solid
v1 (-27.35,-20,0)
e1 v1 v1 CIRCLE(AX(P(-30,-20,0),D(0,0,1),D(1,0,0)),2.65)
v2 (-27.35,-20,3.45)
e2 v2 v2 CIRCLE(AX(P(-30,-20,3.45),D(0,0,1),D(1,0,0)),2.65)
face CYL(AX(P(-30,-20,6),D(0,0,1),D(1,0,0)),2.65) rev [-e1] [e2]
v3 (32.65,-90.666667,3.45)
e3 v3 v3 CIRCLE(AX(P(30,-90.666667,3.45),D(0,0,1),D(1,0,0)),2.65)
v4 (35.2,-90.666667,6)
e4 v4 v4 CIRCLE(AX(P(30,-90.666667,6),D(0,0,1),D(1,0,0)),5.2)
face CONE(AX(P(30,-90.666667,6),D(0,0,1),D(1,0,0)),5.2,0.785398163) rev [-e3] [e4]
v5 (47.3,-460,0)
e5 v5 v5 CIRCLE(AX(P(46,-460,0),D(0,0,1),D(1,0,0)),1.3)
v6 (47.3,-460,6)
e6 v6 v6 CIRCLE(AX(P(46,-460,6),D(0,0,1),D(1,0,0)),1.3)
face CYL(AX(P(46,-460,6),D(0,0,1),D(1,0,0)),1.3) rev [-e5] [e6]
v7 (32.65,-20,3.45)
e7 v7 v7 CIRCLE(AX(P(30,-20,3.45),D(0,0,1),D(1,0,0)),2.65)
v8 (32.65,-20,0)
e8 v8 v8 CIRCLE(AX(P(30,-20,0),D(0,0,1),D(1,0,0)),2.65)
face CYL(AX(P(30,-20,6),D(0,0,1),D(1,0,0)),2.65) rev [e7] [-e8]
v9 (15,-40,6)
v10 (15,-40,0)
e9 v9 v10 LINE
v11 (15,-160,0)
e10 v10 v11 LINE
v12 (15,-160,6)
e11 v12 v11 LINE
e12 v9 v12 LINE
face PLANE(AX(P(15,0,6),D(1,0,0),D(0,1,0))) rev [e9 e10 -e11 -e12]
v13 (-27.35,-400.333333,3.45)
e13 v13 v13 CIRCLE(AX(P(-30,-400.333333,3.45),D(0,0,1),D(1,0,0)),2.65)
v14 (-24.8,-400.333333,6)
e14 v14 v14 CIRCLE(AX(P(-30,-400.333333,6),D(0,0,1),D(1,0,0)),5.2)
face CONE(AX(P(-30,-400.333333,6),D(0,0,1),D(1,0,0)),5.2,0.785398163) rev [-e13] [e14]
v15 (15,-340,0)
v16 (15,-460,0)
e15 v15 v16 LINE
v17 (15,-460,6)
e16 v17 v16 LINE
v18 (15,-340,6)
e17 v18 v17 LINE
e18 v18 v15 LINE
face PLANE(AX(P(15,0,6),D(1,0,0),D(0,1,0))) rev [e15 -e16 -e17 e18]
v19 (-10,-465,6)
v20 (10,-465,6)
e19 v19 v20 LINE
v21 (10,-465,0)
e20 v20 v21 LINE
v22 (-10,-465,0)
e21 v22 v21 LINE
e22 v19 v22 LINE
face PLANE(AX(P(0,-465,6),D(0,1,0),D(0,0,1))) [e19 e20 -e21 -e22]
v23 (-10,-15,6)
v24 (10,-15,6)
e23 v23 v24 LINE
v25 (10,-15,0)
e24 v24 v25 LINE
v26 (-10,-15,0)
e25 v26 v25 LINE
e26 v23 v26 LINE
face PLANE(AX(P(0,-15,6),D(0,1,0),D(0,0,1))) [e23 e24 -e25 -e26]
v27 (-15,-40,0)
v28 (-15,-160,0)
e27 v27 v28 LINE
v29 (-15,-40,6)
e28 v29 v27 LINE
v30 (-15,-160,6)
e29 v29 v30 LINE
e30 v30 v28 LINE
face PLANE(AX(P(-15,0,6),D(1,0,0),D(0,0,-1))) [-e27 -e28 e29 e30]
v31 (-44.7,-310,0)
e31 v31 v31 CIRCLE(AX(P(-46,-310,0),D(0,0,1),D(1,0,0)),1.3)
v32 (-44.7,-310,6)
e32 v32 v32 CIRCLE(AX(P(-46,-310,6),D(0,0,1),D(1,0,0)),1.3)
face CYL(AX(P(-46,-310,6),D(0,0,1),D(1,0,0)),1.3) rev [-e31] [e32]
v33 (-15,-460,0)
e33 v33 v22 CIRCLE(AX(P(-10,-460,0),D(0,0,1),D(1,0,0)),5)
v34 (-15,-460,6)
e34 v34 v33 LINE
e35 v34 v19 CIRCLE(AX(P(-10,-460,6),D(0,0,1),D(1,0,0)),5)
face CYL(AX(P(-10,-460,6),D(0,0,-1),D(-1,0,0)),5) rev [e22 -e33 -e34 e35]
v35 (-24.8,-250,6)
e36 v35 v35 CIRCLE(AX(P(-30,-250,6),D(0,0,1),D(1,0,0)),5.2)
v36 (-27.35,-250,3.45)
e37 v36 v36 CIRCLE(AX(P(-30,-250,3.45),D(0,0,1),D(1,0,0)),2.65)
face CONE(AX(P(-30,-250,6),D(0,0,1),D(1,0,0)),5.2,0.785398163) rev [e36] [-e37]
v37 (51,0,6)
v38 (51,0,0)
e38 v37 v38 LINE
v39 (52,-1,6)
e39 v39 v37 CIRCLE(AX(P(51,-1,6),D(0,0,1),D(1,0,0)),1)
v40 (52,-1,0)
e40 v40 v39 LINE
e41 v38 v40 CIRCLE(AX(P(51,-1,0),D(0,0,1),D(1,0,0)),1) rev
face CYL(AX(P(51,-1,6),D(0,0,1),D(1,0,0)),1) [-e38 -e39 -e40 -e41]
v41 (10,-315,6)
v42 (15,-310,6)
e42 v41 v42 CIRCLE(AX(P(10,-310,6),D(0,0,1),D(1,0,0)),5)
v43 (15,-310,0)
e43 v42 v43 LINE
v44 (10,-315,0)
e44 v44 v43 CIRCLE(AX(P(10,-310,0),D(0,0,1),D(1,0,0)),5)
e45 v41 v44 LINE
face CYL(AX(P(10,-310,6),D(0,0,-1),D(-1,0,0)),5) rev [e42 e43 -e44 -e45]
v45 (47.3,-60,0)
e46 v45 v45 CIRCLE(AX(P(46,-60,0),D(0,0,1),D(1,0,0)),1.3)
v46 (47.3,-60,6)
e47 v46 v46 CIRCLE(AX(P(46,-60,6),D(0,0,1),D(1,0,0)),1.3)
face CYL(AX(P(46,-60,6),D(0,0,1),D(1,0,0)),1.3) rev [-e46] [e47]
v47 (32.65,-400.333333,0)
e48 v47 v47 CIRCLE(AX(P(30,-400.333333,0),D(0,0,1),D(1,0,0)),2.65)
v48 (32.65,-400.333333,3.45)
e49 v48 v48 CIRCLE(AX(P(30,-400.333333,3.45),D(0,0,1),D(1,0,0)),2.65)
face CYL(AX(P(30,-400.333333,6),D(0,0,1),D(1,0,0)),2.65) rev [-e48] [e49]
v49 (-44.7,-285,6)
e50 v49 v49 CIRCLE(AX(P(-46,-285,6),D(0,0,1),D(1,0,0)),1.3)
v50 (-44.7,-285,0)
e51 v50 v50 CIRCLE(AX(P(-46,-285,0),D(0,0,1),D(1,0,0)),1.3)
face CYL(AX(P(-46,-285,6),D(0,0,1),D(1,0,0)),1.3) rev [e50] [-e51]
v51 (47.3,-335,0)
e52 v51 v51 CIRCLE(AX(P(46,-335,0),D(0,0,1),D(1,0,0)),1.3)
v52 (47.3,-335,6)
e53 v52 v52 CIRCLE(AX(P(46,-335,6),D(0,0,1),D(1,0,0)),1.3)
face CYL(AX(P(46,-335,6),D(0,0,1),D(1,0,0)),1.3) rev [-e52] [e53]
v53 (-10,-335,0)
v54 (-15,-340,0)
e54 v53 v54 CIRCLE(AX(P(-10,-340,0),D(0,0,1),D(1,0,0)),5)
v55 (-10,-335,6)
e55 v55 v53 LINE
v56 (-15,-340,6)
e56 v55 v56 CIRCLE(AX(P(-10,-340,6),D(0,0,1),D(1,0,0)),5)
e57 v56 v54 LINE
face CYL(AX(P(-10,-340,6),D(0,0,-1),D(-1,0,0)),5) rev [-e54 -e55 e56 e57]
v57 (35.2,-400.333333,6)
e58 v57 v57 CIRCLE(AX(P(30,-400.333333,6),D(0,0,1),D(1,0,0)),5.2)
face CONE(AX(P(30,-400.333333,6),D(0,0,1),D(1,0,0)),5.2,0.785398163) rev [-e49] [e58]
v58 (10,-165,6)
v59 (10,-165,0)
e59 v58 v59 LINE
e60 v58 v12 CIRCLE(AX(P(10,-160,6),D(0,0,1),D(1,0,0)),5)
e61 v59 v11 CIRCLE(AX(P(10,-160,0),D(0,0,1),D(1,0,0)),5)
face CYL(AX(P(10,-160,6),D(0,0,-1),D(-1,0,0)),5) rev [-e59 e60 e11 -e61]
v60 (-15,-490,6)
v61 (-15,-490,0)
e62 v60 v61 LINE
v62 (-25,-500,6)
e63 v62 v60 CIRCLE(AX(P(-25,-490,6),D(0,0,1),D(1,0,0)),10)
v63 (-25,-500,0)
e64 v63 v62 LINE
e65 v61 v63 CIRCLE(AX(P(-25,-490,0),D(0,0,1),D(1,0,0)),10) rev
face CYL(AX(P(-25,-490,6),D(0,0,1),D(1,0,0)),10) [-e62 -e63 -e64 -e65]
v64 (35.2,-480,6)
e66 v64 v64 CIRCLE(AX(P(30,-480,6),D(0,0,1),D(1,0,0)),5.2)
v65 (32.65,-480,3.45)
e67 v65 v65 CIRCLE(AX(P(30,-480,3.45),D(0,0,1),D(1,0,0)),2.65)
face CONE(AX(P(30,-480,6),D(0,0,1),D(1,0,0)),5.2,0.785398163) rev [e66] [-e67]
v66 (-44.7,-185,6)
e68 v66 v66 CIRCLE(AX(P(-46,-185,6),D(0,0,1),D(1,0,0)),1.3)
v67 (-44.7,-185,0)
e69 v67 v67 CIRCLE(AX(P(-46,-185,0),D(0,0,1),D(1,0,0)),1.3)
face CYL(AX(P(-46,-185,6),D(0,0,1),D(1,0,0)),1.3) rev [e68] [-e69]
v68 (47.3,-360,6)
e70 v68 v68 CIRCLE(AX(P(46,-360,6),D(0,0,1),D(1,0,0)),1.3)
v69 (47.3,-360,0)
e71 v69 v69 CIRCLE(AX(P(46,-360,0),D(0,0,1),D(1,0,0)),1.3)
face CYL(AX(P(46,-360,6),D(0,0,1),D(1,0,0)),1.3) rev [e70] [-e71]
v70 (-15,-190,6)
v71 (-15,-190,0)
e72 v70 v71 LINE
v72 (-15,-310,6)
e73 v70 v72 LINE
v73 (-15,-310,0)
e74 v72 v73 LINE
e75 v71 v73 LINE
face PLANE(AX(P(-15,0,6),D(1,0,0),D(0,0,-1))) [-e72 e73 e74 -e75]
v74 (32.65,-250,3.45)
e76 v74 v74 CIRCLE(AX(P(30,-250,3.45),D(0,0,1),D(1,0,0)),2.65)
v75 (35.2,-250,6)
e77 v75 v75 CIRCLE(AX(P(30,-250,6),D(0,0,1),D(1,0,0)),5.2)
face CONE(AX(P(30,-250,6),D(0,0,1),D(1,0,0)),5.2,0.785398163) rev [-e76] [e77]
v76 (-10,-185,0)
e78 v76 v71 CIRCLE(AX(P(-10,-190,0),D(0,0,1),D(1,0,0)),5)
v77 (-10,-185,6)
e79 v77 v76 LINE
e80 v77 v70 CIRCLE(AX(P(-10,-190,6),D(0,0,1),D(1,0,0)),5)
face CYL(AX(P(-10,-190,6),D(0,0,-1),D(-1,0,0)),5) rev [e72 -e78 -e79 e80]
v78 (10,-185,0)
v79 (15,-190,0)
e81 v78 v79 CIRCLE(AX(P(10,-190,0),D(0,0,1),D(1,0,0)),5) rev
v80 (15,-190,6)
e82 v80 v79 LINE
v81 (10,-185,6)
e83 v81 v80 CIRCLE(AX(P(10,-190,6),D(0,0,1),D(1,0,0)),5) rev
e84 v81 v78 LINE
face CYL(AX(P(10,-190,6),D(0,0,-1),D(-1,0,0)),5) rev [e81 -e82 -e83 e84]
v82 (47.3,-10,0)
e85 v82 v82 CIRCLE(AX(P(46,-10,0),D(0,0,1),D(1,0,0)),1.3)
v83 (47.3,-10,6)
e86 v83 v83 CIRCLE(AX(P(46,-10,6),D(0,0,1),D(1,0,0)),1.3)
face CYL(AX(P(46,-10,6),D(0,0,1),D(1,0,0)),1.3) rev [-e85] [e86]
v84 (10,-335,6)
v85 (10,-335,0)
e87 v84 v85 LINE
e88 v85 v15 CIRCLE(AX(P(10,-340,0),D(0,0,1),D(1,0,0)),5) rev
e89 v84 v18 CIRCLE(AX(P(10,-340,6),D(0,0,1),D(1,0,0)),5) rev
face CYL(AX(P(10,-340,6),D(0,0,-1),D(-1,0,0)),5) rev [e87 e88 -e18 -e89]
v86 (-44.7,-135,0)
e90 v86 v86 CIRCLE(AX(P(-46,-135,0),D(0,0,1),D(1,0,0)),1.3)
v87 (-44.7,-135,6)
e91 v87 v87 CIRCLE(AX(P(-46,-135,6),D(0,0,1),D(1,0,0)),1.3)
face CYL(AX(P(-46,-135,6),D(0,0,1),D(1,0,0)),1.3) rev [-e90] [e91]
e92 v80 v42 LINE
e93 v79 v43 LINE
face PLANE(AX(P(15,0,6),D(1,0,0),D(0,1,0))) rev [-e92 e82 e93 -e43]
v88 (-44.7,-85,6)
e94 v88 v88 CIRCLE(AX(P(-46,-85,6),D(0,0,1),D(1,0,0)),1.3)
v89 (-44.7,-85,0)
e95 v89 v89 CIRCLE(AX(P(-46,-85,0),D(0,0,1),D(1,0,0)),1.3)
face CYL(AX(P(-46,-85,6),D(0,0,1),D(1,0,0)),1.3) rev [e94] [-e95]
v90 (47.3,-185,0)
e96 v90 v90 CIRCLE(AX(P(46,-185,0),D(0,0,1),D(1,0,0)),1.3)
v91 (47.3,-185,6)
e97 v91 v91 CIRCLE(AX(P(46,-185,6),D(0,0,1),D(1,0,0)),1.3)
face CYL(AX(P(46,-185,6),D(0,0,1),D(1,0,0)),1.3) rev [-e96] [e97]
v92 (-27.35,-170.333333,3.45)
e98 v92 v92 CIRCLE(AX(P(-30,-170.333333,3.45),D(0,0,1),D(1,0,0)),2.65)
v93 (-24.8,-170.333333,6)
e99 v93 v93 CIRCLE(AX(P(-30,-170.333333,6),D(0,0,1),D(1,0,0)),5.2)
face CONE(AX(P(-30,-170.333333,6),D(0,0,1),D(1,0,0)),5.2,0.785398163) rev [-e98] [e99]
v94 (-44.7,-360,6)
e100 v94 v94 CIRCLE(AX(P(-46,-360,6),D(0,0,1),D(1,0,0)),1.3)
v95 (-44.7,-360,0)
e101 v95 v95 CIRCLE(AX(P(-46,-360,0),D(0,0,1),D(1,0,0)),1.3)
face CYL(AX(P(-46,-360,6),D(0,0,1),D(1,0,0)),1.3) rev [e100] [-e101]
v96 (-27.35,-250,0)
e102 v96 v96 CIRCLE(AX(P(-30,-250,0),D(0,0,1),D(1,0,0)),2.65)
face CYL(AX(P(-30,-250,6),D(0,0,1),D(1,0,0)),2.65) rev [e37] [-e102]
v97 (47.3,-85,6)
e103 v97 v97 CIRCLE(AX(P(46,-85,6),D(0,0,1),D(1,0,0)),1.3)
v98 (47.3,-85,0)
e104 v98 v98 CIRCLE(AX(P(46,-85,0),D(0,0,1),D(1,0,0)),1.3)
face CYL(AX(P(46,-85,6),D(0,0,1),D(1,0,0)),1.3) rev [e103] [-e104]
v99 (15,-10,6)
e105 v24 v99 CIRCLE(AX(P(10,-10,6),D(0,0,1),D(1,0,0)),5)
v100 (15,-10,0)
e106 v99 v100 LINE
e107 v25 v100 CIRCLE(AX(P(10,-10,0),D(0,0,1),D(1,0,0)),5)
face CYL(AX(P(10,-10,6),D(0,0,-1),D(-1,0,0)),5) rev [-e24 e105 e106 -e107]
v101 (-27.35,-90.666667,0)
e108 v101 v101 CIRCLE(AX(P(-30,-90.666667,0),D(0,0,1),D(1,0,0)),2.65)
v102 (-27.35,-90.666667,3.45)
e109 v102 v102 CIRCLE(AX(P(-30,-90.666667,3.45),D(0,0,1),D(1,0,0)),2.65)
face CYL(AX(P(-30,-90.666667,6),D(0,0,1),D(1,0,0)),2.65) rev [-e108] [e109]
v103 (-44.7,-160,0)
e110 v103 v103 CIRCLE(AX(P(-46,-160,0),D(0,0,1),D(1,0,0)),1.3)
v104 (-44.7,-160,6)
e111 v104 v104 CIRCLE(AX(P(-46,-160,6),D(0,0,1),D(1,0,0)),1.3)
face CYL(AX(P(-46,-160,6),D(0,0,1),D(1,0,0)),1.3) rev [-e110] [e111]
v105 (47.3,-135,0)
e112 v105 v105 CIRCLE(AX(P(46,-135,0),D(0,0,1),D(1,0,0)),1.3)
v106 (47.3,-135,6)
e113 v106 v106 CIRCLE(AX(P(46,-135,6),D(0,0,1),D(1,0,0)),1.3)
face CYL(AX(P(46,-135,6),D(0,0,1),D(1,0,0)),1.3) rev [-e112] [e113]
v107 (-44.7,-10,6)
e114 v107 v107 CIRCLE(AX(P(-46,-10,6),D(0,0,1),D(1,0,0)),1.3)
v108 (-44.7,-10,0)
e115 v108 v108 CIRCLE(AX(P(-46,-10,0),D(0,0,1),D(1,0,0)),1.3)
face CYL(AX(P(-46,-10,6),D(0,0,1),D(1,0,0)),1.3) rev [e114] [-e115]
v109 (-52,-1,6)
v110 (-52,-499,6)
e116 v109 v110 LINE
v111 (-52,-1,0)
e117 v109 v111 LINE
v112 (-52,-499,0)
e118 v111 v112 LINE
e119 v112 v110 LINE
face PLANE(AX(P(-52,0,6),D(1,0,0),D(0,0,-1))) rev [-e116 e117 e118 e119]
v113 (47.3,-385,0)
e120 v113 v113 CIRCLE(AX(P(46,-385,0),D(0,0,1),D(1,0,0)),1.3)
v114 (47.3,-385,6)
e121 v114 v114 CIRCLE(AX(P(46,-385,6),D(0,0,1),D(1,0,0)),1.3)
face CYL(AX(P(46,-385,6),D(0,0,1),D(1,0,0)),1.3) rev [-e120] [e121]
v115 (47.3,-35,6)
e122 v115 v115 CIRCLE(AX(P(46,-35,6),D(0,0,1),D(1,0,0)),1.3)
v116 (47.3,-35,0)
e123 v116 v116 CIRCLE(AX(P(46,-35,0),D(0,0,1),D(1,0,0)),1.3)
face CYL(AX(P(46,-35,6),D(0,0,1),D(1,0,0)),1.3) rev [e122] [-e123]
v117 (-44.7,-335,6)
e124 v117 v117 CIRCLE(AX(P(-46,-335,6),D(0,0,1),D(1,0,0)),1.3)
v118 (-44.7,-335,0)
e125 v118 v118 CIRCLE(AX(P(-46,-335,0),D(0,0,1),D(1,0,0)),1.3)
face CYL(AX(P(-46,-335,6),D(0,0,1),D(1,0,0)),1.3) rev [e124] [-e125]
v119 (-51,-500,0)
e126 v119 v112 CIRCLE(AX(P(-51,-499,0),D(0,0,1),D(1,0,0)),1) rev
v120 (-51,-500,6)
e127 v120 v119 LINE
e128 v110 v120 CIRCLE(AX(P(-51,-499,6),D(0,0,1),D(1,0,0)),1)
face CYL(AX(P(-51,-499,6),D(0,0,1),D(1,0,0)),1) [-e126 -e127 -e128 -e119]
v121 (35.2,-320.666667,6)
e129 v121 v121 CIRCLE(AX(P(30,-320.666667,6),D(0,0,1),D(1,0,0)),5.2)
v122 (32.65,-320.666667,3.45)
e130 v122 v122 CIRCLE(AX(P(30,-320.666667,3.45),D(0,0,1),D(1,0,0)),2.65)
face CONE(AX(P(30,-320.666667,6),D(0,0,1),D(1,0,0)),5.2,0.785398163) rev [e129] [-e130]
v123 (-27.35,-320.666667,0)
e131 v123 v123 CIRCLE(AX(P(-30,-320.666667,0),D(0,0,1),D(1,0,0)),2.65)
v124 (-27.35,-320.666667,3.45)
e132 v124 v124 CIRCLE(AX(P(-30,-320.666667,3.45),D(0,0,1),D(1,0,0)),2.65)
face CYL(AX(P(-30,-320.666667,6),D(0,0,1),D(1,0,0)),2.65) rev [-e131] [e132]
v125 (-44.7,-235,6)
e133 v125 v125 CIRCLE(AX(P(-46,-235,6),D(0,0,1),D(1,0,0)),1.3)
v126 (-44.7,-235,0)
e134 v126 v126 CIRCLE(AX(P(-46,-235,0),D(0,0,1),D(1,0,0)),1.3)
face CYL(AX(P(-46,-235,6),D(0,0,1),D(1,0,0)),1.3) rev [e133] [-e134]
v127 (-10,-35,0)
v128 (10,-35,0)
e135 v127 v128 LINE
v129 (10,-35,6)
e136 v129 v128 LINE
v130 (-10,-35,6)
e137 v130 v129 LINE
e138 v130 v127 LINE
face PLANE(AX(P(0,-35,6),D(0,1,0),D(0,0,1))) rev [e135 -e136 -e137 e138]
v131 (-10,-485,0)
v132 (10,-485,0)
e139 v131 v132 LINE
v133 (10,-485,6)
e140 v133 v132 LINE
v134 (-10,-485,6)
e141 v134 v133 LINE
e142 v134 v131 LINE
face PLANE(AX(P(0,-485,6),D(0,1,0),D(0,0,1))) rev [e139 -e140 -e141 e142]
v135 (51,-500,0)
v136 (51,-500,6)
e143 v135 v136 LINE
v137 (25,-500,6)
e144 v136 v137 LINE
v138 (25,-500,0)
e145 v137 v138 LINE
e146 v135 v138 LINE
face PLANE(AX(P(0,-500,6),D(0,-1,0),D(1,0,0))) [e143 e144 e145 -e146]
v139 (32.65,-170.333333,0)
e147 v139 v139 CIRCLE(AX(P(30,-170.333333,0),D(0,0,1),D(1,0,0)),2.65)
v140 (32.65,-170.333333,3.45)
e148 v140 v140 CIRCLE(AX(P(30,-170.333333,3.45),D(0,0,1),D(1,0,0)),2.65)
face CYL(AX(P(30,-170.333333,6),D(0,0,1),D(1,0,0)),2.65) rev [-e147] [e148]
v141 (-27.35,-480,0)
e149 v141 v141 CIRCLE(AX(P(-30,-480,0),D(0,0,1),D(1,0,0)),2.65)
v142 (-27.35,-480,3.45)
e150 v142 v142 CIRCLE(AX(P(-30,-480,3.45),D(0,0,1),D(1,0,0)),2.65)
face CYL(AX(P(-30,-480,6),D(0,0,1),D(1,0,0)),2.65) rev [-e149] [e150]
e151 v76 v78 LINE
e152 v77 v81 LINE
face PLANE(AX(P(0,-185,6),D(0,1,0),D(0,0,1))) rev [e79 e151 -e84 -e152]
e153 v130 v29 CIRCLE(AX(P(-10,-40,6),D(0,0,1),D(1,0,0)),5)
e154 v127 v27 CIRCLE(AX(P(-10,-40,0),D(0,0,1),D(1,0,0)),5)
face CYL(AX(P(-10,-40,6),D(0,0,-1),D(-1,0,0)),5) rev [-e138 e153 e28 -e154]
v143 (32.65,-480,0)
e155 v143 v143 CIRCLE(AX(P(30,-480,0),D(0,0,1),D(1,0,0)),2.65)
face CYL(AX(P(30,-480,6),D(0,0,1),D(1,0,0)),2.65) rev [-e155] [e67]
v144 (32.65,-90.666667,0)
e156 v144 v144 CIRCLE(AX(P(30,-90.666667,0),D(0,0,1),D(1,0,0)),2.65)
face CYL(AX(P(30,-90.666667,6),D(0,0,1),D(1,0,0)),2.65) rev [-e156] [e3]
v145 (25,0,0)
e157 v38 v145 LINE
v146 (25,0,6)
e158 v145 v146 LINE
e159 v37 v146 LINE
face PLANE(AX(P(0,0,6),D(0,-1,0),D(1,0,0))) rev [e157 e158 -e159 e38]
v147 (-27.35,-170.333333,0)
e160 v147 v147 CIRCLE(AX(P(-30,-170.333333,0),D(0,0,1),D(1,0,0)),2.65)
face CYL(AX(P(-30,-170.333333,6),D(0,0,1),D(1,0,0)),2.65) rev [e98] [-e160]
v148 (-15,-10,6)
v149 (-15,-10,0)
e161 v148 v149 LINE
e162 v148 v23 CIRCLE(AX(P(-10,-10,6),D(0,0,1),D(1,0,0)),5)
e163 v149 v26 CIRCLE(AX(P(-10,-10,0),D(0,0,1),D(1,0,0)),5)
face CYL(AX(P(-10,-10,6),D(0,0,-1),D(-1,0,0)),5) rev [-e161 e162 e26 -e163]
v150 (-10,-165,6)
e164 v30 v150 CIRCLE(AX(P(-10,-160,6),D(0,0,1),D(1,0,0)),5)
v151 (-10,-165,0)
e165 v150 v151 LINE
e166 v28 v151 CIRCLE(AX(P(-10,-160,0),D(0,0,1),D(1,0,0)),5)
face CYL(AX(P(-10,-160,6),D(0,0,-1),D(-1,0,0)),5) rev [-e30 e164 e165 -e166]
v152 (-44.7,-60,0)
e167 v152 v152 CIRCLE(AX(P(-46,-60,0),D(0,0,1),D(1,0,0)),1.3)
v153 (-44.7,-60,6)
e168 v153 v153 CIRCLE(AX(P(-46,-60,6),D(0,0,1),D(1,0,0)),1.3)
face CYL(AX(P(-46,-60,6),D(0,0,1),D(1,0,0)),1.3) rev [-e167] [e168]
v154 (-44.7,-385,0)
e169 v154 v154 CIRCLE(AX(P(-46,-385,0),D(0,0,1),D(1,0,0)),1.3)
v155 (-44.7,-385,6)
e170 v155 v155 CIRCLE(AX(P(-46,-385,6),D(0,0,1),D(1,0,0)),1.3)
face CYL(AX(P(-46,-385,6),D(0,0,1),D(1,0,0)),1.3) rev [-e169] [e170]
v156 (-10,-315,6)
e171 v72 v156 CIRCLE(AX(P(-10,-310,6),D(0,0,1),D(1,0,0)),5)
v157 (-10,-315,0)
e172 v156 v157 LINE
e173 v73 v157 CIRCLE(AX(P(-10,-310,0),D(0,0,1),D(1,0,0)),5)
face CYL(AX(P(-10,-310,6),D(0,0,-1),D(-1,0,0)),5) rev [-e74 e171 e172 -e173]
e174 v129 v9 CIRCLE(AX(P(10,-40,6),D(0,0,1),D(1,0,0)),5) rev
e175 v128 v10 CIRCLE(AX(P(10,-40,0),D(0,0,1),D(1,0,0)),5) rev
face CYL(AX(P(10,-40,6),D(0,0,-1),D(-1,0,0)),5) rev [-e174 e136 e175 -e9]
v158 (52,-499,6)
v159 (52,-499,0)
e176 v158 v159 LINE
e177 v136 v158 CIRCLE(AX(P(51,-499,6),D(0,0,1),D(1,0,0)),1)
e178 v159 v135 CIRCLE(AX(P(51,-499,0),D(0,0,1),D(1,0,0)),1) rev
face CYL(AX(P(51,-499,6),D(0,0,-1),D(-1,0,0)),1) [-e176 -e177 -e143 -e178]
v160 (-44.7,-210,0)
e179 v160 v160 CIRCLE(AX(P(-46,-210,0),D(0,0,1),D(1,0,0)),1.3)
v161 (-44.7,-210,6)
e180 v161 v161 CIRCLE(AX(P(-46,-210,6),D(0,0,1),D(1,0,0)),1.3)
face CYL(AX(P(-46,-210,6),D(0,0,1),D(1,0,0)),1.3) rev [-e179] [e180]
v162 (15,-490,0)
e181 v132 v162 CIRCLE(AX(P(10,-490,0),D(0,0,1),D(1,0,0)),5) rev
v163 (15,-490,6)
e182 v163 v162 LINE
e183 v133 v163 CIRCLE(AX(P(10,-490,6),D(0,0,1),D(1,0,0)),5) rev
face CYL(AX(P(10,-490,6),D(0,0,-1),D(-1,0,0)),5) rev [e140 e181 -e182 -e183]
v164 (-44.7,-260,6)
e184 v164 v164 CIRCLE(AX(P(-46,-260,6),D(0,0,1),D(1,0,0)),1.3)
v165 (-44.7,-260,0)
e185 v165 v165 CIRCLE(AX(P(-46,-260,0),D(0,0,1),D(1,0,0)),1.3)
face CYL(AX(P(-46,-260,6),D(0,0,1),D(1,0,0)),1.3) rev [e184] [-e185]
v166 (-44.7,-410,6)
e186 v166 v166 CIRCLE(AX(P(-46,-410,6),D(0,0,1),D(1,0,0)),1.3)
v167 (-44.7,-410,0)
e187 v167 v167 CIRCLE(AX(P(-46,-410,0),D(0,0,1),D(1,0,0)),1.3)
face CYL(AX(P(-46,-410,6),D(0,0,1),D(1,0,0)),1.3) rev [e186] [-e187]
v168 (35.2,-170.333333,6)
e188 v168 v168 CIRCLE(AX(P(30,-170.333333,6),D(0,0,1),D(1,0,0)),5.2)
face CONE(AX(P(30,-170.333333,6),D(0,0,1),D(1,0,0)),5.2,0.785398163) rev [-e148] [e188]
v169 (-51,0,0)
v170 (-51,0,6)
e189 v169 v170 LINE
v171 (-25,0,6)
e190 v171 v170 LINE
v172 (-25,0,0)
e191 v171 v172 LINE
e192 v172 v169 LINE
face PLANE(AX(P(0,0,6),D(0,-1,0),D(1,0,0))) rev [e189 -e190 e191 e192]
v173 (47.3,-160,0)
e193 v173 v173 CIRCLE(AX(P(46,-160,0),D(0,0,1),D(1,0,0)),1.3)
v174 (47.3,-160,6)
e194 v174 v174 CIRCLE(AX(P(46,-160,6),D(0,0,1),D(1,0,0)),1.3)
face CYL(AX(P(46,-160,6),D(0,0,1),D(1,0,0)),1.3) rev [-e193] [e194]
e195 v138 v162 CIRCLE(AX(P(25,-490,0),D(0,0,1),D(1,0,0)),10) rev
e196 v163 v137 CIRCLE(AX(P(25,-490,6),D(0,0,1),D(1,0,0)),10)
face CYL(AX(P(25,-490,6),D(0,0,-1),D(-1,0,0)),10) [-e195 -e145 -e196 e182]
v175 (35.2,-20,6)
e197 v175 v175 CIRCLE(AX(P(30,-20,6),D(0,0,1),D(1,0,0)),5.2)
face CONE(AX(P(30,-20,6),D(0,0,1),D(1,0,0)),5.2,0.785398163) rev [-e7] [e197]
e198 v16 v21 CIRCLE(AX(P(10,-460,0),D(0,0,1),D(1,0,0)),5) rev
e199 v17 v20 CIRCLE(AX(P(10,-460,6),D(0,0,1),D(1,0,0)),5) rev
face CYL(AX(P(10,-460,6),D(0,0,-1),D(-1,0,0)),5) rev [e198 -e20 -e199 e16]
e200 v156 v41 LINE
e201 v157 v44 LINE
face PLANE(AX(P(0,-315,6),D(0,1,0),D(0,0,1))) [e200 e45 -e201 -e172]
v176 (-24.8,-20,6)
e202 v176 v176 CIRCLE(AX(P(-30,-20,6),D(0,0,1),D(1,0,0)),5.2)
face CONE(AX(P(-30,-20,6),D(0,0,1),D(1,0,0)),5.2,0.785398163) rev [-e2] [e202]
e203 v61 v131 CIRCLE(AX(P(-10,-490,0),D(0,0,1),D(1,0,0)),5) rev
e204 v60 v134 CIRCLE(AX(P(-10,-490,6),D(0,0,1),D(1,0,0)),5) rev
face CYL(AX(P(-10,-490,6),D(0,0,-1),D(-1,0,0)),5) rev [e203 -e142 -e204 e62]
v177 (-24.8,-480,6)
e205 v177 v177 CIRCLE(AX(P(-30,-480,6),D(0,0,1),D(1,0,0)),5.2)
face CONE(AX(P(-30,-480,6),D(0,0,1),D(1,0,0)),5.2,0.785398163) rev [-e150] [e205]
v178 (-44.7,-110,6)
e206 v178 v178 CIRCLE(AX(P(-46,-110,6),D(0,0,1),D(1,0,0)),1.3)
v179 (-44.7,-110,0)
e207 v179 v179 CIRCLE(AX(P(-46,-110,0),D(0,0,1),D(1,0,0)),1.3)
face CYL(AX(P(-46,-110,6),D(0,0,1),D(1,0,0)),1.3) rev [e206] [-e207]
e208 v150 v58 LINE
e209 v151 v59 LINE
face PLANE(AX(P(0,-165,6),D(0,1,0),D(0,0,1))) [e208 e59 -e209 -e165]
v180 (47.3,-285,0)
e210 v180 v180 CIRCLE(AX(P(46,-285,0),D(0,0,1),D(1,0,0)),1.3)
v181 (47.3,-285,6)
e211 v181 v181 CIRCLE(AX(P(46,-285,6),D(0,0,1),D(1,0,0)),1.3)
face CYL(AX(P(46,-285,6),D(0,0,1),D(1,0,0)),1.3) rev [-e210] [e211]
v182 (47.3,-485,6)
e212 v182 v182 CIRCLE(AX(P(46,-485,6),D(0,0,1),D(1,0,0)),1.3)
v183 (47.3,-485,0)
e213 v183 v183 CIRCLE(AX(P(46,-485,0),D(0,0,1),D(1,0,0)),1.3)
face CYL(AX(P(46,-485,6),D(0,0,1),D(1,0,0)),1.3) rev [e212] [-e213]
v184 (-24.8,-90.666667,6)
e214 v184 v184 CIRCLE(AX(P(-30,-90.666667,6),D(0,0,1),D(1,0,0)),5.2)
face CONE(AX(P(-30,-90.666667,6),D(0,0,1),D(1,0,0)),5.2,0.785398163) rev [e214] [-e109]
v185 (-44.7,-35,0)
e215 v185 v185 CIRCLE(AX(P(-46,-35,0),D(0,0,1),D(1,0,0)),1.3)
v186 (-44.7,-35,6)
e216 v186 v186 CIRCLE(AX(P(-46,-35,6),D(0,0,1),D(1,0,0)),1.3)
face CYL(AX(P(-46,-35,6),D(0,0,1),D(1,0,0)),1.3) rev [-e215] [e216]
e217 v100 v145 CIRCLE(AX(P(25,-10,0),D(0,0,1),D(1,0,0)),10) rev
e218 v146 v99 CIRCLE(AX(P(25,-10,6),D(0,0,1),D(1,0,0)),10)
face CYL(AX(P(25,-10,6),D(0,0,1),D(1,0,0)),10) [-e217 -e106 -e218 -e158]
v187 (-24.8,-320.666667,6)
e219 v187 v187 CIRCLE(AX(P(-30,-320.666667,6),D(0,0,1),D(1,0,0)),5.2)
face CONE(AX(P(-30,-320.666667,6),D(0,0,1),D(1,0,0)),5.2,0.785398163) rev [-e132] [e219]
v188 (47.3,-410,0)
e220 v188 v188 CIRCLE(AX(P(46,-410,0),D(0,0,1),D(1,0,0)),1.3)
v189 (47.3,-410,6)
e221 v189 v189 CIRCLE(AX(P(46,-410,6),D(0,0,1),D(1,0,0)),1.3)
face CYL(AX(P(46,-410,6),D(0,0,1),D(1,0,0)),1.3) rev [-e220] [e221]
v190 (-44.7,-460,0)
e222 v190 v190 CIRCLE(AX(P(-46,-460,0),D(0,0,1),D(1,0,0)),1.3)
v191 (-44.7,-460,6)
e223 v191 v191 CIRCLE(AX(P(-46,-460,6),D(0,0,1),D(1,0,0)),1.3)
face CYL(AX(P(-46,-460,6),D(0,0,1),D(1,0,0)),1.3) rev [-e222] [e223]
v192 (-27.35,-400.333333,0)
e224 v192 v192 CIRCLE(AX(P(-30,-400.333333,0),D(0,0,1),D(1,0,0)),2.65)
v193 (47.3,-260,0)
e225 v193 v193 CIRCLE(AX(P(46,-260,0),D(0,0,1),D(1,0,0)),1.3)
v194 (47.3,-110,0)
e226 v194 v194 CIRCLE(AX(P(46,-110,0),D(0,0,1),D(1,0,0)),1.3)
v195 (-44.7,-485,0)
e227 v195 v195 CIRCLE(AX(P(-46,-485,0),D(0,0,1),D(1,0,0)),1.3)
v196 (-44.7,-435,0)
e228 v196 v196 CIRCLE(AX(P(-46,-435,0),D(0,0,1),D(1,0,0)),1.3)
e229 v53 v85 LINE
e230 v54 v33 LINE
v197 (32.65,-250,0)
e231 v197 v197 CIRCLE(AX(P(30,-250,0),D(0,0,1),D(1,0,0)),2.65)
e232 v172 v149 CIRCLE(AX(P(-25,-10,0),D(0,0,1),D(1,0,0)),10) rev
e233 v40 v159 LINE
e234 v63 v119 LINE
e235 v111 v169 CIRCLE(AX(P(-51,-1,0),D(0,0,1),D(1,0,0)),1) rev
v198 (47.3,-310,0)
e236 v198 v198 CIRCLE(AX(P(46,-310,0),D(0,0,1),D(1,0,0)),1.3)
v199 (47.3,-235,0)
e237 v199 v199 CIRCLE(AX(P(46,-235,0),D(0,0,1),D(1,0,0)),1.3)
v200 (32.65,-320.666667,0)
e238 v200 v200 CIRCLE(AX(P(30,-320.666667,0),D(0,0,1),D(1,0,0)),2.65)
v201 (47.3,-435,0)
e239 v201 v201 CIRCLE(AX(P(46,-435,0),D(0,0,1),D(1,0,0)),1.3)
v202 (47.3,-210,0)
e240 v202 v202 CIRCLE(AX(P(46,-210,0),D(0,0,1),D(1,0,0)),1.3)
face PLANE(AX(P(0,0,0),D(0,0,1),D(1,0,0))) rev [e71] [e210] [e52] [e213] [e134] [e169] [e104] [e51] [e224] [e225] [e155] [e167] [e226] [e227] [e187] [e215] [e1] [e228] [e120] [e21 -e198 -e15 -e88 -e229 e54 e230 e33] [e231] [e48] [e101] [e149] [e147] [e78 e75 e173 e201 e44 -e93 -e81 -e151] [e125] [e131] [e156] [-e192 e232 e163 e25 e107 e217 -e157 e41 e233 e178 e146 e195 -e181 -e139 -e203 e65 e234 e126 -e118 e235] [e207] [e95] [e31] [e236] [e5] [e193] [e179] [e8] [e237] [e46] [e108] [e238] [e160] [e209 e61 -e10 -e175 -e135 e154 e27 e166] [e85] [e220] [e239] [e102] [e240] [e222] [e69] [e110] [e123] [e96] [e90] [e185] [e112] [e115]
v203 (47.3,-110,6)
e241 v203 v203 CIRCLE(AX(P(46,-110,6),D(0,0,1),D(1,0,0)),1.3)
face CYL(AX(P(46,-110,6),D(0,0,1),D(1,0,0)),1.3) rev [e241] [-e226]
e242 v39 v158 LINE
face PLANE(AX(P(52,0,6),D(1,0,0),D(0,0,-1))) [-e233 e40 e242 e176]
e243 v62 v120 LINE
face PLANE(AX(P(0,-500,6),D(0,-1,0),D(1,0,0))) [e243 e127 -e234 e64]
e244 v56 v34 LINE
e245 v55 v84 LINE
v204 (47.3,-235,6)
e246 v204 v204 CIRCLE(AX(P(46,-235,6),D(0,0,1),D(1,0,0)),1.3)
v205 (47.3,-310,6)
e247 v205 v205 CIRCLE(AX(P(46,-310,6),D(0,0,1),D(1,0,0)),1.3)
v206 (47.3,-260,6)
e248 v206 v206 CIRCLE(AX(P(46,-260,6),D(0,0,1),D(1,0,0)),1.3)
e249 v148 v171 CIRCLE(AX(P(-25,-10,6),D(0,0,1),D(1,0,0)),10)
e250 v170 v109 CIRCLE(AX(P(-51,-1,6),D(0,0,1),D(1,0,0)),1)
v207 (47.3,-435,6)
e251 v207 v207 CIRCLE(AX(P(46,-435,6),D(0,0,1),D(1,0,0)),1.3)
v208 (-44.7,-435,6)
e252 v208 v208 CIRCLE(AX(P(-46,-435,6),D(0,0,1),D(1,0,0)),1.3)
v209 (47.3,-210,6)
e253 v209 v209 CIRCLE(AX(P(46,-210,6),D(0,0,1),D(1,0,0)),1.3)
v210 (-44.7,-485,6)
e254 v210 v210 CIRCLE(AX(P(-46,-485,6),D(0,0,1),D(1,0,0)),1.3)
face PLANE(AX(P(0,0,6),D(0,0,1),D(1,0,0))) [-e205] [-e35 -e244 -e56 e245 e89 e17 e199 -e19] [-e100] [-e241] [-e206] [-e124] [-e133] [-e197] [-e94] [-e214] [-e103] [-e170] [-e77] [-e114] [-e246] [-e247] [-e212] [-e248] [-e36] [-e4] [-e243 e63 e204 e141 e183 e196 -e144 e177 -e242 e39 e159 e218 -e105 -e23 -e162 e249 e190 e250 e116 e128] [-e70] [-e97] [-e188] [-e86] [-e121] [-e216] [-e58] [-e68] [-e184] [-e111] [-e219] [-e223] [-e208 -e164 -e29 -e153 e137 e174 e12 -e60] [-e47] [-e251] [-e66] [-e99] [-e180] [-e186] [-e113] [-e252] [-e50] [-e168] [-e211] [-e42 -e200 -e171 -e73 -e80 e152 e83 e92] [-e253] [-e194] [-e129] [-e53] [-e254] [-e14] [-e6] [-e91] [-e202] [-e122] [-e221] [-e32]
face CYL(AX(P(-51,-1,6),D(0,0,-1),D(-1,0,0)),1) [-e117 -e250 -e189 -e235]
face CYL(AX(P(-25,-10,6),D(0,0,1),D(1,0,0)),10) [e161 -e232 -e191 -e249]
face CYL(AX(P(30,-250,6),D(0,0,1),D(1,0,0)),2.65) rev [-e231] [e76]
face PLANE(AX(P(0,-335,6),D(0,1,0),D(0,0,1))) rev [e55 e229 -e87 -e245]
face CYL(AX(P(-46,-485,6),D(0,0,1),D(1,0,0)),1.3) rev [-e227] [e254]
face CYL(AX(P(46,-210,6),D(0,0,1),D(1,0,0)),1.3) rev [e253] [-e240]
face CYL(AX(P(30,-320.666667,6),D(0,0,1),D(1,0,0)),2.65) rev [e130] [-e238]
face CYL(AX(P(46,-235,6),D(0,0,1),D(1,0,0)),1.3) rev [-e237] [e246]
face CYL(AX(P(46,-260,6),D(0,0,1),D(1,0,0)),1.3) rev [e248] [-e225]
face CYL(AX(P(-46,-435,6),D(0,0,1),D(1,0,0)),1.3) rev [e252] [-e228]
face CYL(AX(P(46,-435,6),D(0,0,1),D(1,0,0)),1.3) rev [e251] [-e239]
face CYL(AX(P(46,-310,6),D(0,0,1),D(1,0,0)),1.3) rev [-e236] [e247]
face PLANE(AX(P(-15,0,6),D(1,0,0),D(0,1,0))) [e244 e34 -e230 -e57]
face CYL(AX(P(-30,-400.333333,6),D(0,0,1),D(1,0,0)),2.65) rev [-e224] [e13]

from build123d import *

# Parameters (mm, degrees)
BOSS_EXTRUDE1_DEPTH                                 = 6
CSK_FOR_M5_COUNTERSUNK_FLAT_HEAD_SCREW1_D           = 5.3
CSK_FOR_M5_COUNTERSUNK_FLAT_HEAD_SCREW1_CSINK_D     = 10.4
CSK_FOR_M5_COUNTERSUNK_FLAT_HEAD_SCREW1_CSINK_ANGLE = 90
F_2_6_2_6_DIAMETER_HOLE1_D                          = 2.6
FILLET1_R                                           = 10
FILLET2_R                                           = 1


with BuildPart() as part:
    # Sketch1 → Boss-Extrude1 (new body)
    with BuildSketch(Plane.XY):
        with BuildLine():
            Line((-15, -10), (-15, 0))
            Line((-15, 0), (-52, 0))
            Line((-52, 0), (-52, -500))
            Line((-52, -500), (-15, -500))
            Line((-15, -500), (-15, -490))
            ThreePointArc((-15, -490), (-13.535533906, -486.464466094), (-10, -485))
            Line((-10, -485), (10, -485))
            ThreePointArc((10, -485), (13.535533906, -486.464466094), (15, -490))
            Line((15, -490), (15, -500))
            Line((15, -500), (52, -500))
            Line((52, -500), (52, 0))
            Line((52, 0), (15, 0))
            Line((15, 0), (15, -10))
            ThreePointArc((15, -10), (13.535533906, -13.535533906), (10, -15))
            Line((10, -15), (-10, -15))
            ThreePointArc((-10, -15), (-13.535533906, -13.535533906), (-15, -10))
        make_face()
        with BuildLine():
            ThreePointArc((-15, -340), (-13.535533906, -336.464466094), (-10, -335))
            Line((-10, -335), (10, -335))
            ThreePointArc((10, -335), (13.535533906, -336.464466094), (15, -340))
            Line((15, -340), (15, -460))
            ThreePointArc((15, -460), (13.535533906, -463.535533906), (10, -465))
            Line((10, -465), (-10, -465))
            ThreePointArc((-10, -465), (-13.535533906, -463.535533906), (-15, -460))
            Line((-15, -460), (-15, -340))
        make_face(mode=Mode.SUBTRACT)
        with BuildLine():
            ThreePointArc((-15, -190), (-13.535533906, -186.464466094), (-10, -185))
            Line((-10, -185), (10, -185))
            ThreePointArc((10, -185), (13.535533906, -186.464466094), (15, -190))
            Line((15, -190), (15, -310))
            ThreePointArc((15, -310), (13.535533906, -313.535533906), (10, -315))
            Line((10, -315), (-10, -315))
            ThreePointArc((-10, -315), (-13.535533906, -313.535533906), (-15, -310))
            Line((-15, -310), (-15, -190))
        make_face(mode=Mode.SUBTRACT)
        with BuildLine():
            ThreePointArc((-15, -40), (-13.535533906, -36.464466094), (-10, -35))
            Line((-10, -35), (10, -35))
            ThreePointArc((10, -35), (13.535533906, -36.464466094), (15, -40))
            Line((15, -40), (15, -160))
            ThreePointArc((15, -160), (13.535533906, -163.535533906), (10, -165))
            Line((10, -165), (-10, -165))
            ThreePointArc((-10, -165), (-13.535533906, -163.535533906), (-15, -160))
            Line((-15, -160), (-15, -40))
        make_face(mode=Mode.SUBTRACT)
    extrude(amount=BOSS_EXTRUDE1_DEPTH)

    # CSK for M5 Countersunk Flat Head Screw1 (through all)
    with Locations(Plane.XY.offset(6)):
        with Locations((30, -480), (-30, -20), (30, -20), (-30, -90.666666667), (30, -90.666666667), (-30, -170.333333333), (30, -170.333333333), (30, -250), (-30, -250), (-30, -320.666666667), (30, -320.666666667), (-30, -400.333333333), (30, -400.333333333), (-30, -480)):
            CounterSinkHole(CSK_FOR_M5_COUNTERSUNK_FLAT_HEAD_SCREW1_D / 2, CSK_FOR_M5_COUNTERSUNK_FLAT_HEAD_SCREW1_CSINK_D / 2, counter_sink_angle=CSK_FOR_M5_COUNTERSUNK_FLAT_HEAD_SCREW1_CSINK_ANGLE)

    # Ø2.6 (2.6) Diameter Hole1 (through all)
    with Locations(Plane.XY.offset(6)):
        with Locations((-46, -510), (-46, -10), (46, -10), (46, -35), (46, -60), (46, -85), (46, -110), (46, -135), (46, -160), (46, -185), (46, -210), (46, -235), (46, -260), (46, -285), (46, -310), (46, -335), (46, -360), (46, -385), (46, -410), (46, -435), (46, -460), (46, -485), (46, -510), (-46, -35), (-46, -60), (-46, -85), (-46, -110), (-46, -135), (-46, -160), (-46, -185), (-46, -210), (-46, -235), (-46, -260), (-46, -285), (-46, -310), (-46, -335), (-46, -360), (-46, -385), (-46, -410), (-46, -435), (-46, -460), (-46, -485)):
            Hole(F_2_6_2_6_DIAMETER_HOLE1_D / 2)

    # Fillet1
    fillet1_edges = [part.edges().sort_by_distance(p)[0] for p in [
        (15, 0, 3),
        (-15, 0, 3),
        (15, -500, 3),
        (-15, -500, 3),
    ]]
    fillet(fillet1_edges, radius=FILLET1_R - 0.0001)  # a hair under: the kernel refuses the full size

    # Fillet2
    fillet2_edges = [part.edges().sort_by_distance(p)[0] for p in [
        (-52, -500, 3),
        (-52, 0, 3),
        (52, 0, 3),
        (52, -500, 3),
    ]]
    fillet(fillet2_edges, radius=FILLET2_R)


solid = part.part
